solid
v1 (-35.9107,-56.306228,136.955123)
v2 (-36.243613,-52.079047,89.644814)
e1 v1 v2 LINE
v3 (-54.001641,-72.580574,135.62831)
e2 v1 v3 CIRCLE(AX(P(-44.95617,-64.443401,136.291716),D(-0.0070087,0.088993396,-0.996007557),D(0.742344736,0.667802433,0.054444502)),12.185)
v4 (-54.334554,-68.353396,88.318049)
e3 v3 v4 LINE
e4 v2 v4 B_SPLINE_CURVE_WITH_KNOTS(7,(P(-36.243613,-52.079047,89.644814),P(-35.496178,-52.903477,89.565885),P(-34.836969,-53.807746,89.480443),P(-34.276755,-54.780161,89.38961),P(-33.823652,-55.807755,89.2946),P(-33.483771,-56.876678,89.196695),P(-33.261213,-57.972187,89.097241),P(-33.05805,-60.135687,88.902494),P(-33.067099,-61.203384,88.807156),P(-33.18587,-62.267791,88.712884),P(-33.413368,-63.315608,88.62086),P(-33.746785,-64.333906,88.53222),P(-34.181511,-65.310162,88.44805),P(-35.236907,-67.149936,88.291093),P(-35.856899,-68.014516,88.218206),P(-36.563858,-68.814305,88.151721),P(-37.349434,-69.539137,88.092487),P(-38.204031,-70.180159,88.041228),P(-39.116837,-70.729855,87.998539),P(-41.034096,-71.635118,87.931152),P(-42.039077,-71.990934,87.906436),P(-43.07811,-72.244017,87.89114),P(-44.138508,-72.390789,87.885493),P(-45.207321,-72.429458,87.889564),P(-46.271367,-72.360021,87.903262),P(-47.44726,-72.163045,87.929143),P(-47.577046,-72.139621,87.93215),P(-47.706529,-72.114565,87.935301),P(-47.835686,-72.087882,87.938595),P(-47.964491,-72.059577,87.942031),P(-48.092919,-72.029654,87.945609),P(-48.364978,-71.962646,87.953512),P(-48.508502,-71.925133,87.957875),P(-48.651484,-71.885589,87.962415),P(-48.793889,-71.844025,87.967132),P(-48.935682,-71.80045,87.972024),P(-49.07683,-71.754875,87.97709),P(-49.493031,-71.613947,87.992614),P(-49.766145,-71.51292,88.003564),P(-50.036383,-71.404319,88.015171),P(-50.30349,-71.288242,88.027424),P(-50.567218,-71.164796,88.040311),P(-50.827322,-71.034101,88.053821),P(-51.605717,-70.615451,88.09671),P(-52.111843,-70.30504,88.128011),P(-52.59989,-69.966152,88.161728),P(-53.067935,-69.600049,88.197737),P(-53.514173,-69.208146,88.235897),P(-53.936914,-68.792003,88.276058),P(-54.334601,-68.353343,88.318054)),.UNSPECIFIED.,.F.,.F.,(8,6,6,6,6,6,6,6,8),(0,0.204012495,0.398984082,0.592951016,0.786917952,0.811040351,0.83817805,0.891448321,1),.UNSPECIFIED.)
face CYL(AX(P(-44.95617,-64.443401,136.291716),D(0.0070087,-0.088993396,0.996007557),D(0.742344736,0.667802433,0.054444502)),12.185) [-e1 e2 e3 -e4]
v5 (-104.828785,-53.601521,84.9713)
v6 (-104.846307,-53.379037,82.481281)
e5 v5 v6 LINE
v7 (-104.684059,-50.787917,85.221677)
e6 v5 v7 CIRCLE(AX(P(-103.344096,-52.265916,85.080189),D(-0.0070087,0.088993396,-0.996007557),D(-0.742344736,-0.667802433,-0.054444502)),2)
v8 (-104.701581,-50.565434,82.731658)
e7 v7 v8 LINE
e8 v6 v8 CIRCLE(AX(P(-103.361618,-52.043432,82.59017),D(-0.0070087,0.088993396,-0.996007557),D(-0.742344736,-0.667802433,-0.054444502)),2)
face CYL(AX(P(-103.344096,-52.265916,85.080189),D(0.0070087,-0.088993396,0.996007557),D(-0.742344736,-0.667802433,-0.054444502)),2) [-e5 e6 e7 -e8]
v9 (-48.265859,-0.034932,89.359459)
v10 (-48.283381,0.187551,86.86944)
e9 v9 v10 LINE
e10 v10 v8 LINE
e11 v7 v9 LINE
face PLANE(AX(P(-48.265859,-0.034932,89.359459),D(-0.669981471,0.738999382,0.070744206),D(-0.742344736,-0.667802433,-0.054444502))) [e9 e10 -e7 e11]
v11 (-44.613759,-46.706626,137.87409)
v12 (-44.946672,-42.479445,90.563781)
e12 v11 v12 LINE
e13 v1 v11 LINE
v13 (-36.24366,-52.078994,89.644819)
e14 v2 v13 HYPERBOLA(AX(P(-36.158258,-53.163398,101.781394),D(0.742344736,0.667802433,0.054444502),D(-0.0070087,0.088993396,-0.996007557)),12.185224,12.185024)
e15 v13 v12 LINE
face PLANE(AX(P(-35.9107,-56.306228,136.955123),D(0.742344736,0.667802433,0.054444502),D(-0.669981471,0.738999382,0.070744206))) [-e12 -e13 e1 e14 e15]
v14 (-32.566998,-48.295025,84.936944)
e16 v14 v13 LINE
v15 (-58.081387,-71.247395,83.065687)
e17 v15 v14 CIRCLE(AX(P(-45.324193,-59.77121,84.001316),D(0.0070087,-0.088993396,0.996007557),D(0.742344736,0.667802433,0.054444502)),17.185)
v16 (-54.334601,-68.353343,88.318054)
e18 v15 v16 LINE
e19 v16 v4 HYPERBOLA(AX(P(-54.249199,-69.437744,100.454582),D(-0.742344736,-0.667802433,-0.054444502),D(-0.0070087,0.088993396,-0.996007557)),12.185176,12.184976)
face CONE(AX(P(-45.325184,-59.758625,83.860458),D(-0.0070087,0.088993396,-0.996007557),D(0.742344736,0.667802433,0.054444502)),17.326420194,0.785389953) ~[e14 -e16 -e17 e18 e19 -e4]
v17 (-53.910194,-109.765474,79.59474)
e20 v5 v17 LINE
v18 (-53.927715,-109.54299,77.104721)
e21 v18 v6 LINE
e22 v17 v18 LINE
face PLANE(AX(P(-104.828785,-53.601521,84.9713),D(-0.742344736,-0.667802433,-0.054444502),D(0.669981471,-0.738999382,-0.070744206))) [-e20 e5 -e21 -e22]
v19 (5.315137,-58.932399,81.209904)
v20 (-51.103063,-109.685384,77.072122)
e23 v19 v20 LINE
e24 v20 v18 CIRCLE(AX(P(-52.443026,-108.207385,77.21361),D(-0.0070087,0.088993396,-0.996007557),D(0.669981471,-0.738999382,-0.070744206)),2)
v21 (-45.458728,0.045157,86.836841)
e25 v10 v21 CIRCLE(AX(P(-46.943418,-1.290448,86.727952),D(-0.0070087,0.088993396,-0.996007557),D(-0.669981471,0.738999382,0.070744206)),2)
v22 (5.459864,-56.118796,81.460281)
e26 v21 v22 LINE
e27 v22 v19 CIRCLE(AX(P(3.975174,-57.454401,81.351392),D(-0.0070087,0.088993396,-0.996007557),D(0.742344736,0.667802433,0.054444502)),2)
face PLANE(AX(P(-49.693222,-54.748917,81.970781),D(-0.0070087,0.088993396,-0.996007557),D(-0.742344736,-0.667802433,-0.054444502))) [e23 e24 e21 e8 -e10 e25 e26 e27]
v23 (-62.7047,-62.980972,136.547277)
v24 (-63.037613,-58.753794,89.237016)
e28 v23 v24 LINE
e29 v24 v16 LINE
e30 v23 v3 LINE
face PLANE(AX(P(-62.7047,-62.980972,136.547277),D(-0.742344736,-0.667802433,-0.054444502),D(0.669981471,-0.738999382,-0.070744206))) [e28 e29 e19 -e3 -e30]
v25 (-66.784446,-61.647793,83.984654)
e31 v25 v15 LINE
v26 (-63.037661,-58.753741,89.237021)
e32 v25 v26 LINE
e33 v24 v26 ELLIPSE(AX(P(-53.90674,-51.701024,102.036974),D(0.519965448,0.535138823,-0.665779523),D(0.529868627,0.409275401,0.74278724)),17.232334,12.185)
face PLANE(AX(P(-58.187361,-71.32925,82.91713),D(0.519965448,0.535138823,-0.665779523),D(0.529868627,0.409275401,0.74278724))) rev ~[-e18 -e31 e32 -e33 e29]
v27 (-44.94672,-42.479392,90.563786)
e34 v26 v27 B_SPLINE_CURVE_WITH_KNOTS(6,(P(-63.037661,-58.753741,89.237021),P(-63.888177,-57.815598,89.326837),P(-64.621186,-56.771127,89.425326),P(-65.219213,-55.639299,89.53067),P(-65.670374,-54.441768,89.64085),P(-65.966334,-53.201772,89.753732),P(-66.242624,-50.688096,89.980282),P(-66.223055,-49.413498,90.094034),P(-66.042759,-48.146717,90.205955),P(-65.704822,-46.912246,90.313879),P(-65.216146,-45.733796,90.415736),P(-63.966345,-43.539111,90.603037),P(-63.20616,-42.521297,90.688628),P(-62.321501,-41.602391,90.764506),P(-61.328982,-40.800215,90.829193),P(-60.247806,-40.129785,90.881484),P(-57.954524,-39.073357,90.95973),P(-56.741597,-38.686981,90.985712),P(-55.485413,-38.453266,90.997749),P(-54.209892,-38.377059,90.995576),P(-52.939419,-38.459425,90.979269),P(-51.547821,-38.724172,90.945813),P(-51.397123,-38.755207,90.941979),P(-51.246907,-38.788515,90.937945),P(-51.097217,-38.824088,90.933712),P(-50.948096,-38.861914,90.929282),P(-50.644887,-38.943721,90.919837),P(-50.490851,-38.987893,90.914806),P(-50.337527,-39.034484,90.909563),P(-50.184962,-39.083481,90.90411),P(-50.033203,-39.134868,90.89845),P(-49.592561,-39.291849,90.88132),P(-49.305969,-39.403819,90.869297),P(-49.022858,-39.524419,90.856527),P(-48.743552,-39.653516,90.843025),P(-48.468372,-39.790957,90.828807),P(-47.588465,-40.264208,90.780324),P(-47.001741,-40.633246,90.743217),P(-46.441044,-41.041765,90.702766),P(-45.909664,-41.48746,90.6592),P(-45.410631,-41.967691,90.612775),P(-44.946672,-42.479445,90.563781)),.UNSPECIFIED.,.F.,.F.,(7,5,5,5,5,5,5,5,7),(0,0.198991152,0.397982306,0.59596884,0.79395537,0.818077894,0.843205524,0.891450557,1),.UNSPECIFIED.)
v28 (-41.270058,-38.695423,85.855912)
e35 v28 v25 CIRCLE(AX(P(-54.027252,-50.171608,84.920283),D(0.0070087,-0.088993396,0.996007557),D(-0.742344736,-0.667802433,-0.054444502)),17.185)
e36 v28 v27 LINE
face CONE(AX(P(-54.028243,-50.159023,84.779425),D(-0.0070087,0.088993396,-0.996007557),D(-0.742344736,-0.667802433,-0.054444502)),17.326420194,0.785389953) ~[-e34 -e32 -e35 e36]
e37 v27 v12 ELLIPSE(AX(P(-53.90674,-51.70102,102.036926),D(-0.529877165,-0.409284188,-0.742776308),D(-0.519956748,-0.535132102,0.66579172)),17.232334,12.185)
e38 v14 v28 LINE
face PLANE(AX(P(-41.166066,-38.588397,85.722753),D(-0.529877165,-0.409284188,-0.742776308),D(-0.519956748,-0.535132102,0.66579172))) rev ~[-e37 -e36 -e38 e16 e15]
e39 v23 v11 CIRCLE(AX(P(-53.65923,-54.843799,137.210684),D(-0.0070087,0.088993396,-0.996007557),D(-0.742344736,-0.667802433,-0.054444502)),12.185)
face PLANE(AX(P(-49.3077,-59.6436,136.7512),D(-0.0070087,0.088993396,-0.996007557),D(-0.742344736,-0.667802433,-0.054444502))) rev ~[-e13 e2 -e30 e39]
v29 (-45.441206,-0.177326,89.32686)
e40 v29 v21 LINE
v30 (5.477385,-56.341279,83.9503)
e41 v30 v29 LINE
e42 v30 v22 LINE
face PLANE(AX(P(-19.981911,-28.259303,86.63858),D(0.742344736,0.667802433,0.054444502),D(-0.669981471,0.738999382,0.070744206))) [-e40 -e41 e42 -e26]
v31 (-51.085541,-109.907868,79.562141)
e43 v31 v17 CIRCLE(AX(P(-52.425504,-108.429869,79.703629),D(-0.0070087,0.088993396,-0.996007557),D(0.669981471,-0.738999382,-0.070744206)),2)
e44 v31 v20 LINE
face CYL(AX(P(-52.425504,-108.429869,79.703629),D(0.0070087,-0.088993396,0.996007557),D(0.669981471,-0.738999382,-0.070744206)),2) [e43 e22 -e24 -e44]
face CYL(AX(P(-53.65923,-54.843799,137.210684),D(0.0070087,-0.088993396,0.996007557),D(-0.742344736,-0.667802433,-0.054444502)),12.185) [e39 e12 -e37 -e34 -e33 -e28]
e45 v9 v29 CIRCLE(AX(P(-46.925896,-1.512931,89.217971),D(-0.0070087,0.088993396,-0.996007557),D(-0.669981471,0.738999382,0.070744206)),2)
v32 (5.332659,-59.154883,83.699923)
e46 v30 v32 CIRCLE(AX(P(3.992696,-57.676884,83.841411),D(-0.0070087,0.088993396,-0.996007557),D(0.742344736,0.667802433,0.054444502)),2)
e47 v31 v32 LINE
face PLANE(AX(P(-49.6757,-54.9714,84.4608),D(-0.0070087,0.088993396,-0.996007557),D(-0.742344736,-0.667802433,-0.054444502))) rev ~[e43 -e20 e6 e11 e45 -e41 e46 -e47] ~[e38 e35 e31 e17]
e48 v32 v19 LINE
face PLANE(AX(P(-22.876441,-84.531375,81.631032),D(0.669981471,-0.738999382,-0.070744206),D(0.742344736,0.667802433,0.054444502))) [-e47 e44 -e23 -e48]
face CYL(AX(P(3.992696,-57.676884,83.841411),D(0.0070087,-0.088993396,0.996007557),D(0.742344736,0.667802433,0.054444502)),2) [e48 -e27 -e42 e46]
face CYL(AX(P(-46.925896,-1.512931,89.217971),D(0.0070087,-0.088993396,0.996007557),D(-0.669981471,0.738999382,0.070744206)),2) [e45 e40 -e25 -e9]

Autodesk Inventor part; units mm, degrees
ref_plane "YZ Plane" through (0, 0, 0) normal (1, 0, 0) x (0, 1, 0)
ref_plane "XZ Plane" through (0, 0, 0) normal (0, 1, 0) x (-1, 0, 0)
ref_plane "Work Plane1" through (-49.3077, -59.6436, 136.7512) normal (-0.0070087, 0.0889934, -0.9960076) x (-0.7423447, -0.6678024, -0.0544445)
sketch "Sketch1" plane through (-49.3077, -59.6436, 136.7512) normal (-0.0070087, 0.0889934, -0.9960076) x (-0.7423447, -0.6678024, -0.0544445)
  arc A0 (12.185, 6.495) -> (-12.185, 6.495) centre (0, 6.495) ccw projected
  arc A1 (12.185, 6.495) -> (-12.185, 6.495) centre (0, 6.495) ccw projected
  line L0 (-12.185, -6.495) -> (-12.185, 6.495) projected
  arc A2 (-12.185, -6.495) -> (12.185, -6.495) centre (0, -6.495) ccw projected
  arc A3 (-12.185, -6.495) -> (12.185, -6.495) centre (0, -6.495) ccw projected
  line L1 (12.185, 6.495) -> (12.185, -6.495) projected
  line L2 (-10.685, -6.495) -> (-10.685, 6.005)
  arc A4 (10.685, 6.495) -> (-10.685, 6.495) centre (0, 6.495) ccw
  arc A5 (-10.685, -6.495) -> (10.685, -6.495) centre (0, -6.495) ccw
  line L3 (10.685, 6.495) -> (10.685, -6.005)
  point P0 (-68.9881, 1.367)
  point P1 (10.685, 6.495)
  point P2 (10.5, -6.25)
  point P3 (-10.685, -6.495)
  point P4 (-10.5, 6.25)
  dimension "d0" = 1.5
  dimension "d1" = 1.5
  dimension "d2" = 1.5
  dimension "d3" = 1.5
extrude "Extrusion1" add sketch "Sketch1" along normal blind 50
sketch "Sketch2" plane through (-49.6582, -55.1939, 86.9509) normal (-0.0070087, 0.0889934, -0.9960076) x (-0.7423447, -0.6678024, -0.0544445)
  arc A0 (12.185, 6.495) -> (-12.185, 6.495) centre (0, 6.495) ccw projected
  line L0 (12.185, -6.495) -> (12.185, 6.495) projected
  arc A1 (-12.185, -6.495) -> (12.185, -6.495) centre (0, -6.495) ccw projected
  line L1 (-12.185, 6.495) -> (-12.185, -6.495) projected
  point P0 (-68.9881, 1.367)
extrude "Extrusion2" add sketch "Sketch2" along normal blind 2.5
sketch "Sketch3" plane through (-49.6757, -54.9714, 84.4608) normal (-0.0070087, 0.0889934, -0.9960076) x (-0.7423447, -0.6678024, -0.0544445)
  line L0 (-38, 40) -> (38, 40)
  line L1 (40, 38) -> (40, -38)
  line L2 (38, -40) -> (-38, -40)
  line L3 (-40, -38) -> (-40, 38)
  arc A0 (12.185, 6.495) -> (-12.185, 6.495) centre (0, 6.495) ccw projected
  line L4 (0, 40) -> (0, 18.68)
  arc A1 (-12.185, -6.495) -> (12.185, -6.495) centre (0, -6.495) ccw projected
  line L5 (0, -18.68) -> (0, -40)
  line L6 (-12.185, 6.495) -> (-12.185, -6.495) projected
  line L7 (-12.185, 0) -> (-40, 0)
  line L8 (12.185, -6.495) -> (12.185, 6.495) projected
  line L9 (12.185, 0) -> (40, 0)
  arc A2 (-38, 40) -> (-40, 38) centre (-38, 38) ccw
  arc A3 (40, 38) -> (38, 40) centre (38, 38) ccw
  arc A4 (-40, -38) -> (-38, -40) centre (-38, -38) ccw
  arc A5 (38, -40) -> (40, -38) centre (38, -38) ccw
  point P0 (-68.9881, 1.367)
  point P1 (-40, 40)
  point P2 (40, -40)
  point P3 (-40, -40)
  dimension "d8" = 80
  dimension "d9" = 80
  dimension "d11" = 2
  dimension "d12" = 2
  dimension "d13" = 2
  dimension "d14" = 2
extrude "Extrusion3" add sketch "Sketch3" along normal blind 2.5
chamfer "Chamfer1" distance 5 angle 45 4 edges at (-58.7212, -63.1086, 83.7974) (-62.1909, -41.1669, 85.7823) (-40.6302, -46.8343, 85.1242) (-37.1604, -68.7759, 83.1393)
properties part number "Staging_area"
